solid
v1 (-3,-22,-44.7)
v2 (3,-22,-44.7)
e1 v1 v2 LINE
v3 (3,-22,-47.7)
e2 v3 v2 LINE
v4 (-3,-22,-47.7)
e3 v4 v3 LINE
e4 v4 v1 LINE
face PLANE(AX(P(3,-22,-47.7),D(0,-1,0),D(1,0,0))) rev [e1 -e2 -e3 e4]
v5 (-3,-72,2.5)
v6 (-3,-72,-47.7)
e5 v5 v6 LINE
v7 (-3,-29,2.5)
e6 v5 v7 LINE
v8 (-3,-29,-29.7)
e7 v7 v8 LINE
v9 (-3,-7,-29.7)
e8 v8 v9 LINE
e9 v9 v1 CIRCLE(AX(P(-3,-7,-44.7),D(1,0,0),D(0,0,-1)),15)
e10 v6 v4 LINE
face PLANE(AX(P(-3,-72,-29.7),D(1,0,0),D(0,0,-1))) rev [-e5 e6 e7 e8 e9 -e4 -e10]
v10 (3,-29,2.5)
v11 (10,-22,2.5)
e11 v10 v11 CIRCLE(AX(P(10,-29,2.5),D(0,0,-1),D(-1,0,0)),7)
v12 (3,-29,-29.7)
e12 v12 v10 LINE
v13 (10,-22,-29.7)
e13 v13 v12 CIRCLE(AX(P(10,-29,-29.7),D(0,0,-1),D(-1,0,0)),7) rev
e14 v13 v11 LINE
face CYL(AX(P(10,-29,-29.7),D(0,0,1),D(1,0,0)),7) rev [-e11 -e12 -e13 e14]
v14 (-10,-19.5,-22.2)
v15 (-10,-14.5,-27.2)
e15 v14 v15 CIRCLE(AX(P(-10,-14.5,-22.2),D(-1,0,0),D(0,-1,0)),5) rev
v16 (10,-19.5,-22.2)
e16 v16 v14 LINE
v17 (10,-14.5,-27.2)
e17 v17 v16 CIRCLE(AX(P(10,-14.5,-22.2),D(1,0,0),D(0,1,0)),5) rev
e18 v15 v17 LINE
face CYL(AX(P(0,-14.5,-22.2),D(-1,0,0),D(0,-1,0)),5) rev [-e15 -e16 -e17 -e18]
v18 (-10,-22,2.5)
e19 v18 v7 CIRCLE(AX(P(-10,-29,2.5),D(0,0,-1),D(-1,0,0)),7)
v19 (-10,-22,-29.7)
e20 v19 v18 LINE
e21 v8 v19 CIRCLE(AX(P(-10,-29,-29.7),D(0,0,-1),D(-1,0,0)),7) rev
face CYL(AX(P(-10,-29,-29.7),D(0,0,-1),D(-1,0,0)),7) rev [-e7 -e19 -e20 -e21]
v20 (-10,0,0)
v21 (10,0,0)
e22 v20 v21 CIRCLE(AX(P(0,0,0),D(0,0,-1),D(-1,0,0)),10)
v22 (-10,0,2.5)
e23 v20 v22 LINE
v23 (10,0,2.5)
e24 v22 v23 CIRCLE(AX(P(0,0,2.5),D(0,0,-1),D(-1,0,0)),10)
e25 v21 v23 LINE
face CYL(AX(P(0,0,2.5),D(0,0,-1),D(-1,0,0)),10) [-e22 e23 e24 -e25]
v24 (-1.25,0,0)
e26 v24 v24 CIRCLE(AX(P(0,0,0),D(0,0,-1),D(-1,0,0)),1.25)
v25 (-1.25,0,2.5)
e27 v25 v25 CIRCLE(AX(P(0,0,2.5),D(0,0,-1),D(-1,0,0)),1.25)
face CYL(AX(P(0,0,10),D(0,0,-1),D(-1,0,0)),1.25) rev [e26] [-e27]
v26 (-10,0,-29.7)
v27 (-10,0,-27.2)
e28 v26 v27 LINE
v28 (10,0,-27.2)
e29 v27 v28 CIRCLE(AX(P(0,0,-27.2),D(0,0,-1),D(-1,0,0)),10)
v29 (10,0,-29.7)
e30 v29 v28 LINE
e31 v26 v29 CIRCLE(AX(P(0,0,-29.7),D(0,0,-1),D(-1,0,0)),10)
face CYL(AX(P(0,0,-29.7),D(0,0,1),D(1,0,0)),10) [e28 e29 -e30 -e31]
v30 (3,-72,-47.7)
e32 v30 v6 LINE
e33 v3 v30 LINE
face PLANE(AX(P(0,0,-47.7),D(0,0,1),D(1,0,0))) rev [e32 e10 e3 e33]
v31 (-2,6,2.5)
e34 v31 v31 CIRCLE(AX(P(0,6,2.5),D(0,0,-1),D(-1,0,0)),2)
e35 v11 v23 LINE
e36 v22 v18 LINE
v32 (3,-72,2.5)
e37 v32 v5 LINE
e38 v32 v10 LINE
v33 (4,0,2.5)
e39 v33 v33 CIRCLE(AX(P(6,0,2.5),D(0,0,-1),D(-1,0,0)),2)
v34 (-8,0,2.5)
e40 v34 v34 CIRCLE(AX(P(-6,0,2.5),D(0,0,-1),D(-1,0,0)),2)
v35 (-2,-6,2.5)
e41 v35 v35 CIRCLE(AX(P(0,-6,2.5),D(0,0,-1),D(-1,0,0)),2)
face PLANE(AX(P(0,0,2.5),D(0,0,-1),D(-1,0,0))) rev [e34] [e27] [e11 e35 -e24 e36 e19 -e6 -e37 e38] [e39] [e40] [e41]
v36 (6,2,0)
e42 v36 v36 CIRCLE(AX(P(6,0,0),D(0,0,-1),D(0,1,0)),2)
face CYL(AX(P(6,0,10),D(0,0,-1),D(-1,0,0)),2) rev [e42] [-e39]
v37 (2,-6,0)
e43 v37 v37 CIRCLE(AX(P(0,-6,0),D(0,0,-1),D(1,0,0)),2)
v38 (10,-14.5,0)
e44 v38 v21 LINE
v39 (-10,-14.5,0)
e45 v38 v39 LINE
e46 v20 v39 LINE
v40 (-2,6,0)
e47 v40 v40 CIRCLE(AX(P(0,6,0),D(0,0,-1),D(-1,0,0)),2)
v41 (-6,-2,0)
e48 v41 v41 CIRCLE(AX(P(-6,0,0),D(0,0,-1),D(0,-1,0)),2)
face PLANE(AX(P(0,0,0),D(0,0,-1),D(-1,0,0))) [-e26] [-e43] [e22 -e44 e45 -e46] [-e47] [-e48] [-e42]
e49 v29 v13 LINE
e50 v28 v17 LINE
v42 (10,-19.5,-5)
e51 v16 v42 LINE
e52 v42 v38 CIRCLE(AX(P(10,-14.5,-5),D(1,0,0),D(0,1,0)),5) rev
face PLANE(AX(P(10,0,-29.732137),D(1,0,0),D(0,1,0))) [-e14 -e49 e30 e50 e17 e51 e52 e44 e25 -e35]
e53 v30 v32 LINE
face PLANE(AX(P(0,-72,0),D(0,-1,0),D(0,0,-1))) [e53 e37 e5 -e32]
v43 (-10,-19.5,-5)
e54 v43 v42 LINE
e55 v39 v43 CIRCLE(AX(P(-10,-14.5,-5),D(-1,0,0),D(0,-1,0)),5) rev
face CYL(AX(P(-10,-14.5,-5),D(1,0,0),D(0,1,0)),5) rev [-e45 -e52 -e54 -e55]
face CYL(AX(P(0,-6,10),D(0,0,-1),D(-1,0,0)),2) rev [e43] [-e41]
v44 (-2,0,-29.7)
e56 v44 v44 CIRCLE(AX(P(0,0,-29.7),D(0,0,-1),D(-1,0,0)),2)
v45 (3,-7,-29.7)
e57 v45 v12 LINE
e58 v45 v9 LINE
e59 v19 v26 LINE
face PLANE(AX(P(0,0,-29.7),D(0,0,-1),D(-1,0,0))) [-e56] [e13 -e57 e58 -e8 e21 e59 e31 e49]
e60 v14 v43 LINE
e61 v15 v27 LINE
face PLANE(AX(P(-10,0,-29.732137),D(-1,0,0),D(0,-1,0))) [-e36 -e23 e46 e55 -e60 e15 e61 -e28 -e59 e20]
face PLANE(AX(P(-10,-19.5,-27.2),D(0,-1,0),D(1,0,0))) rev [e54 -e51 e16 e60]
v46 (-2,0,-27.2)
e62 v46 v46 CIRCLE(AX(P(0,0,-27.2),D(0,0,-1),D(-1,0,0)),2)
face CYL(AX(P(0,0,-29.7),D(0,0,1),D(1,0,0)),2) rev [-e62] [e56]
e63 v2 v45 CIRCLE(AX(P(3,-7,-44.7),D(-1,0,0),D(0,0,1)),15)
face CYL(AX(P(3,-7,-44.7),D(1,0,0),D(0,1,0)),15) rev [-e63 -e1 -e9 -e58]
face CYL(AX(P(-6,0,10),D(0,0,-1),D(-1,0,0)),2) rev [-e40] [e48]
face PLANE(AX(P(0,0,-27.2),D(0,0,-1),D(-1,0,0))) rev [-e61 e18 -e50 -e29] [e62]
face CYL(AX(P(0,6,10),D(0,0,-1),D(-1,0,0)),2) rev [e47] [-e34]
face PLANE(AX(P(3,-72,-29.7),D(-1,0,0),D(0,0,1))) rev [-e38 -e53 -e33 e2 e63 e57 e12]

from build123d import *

# Parameters (mm, degrees)
SKETCH2_R           = 10
BOSS_EXTRUDE1_DEPTH = 2.5
SKETCH4_R           = 1.25
CUT_EXTRUDE3_DEPTH  = 10
SKETCH5_R           = 2
CUT_EXTRUDE4_DEPTH  = 10
CIRPATTERN1_COUNT   = 4
BOSS_EXTRUDE2_START = -2.5
BOSS_EXTRUDE2_DEPTH = 2.5
SKETCH8_W           = 20
SKETCH8_H           = 2.5
BOSS_EXTRUDE3_DEPTH = 27.2
BOSS_EXTRUDE4_START = 2.5
SKETCH10_R          = 2
BOSS_EXTRUDE4_DEPTH = 2.5
FILLET1_R           = 5
SKETCH12_W          = 6
SKETCH12_H          = 32.2
BOSS_EXTRUDE5_DEPTH = 50
SKETCH13_W          = 6
SKETCH13_H          = 50
BOSS_EXTRUDE6_DEPTH = 18
FILLET2_R           = 7
FILLET3_R           = 15


with BuildPart() as part:
    # Sketch2 → Boss-Extrude1 (new body)
    with BuildSketch(Plane(origin=(0, 0, 0), x_dir=(-1, 0, 0), z_dir=(0, 0, -1))):
        Circle(SKETCH2_R)
    extrude(amount=-BOSS_EXTRUDE1_DEPTH)

    # Sketch4 → Cut-Extrude3 (cut)
    with BuildSketch(Plane(origin=(0, 0, 0), x_dir=(-1, 0, 0), z_dir=(0, 0, -1))):
        Circle(SKETCH4_R)
    extrude(amount=-CUT_EXTRUDE3_DEPTH, mode=Mode.SUBTRACT)

    # Sketch5 → Cut-Extrude4 (cut)
    with BuildSketch(Plane(origin=(0, 0, 0), x_dir=(-1, 0, 0), z_dir=(0, 0, -1))):
        with Locations((0, 6)):
            Circle(SKETCH5_R)
    cut_extrude4 = extrude(amount=-CUT_EXTRUDE4_DEPTH, mode=Mode.SUBTRACT)

    # CirPattern1: Cut-Extrude4 ×4 about axis
    cirpattern1_axis = Axis((0, 0, 0), (0, 0, 1))
    for i in range(1, CIRPATTERN1_COUNT):
        add(cut_extrude4.rotate(cirpattern1_axis, i * 360 / CIRPATTERN1_COUNT), mode=Mode.SUBTRACT)

    # Sketch6 → Boss-Extrude2 (add)
    with BuildSketch(Plane.XY.offset(2.5).offset(BOSS_EXTRUDE2_START)):
        with BuildLine():
            Line((-10, 0), (-10, -22))
            Line((-10, -22), (10, -22))
            Line((10, -22), (10, 0))
            ThreePointArc((10, 0), (0, -10), (-10, 0))
        make_face()
    extrude(amount=BOSS_EXTRUDE2_DEPTH)

    # Sketch8 → Boss-Extrude3 (add)
    with BuildSketch(Plane(origin=(0, 0, 0), x_dir=(-1, 0, 0), z_dir=(0, 0, -1))):
        with Locations((0, -20.75)):
            Rectangle(SKETCH8_W, SKETCH8_H)
    extrude(amount=BOSS_EXTRUDE3_DEPTH)

    # Sketch10 → Boss-Extrude4 (add)
    with BuildSketch(Plane(origin=(0, 0, -27.2), x_dir=(-1, 0, 0), z_dir=(0, 0, -1)).offset(BOSS_EXTRUDE4_START)):
        with BuildLine():
            Line((-10, -22), (10, -22))
            Line((10, -22), (10, 0))
            ThreePointArc((10, 0), (0, 10), (-10, 0))
            Line((-10, 0), (-10, -22))
        make_face()
        Circle(SKETCH10_R, mode=Mode.SUBTRACT)
    extrude(amount=-BOSS_EXTRUDE4_DEPTH)

    # Fillet1
    fillet1_edges = [part.edges().sort_by_distance(p)[0] for p in [
        (0, -19.5, 0),
        (0, -19.5, -27.2),
    ]]
    fillet(fillet1_edges, radius=FILLET1_R)

    # Sketch12 → Boss-Extrude5 (add)
    with BuildSketch(Plane.XZ.offset(22)):
        with Locations((0, -13.6)):
            Rectangle(SKETCH12_W, SKETCH12_H)
    extrude(amount=BOSS_EXTRUDE5_DEPTH)

    # Sketch13 → Boss-Extrude6 (add)
    with BuildSketch(Plane(origin=(0, 0, -29.7), x_dir=(-1, 0, 0), z_dir=(0, 0, -1))):
        with Locations((0, -47)):
            Rectangle(SKETCH13_W, SKETCH13_H)
    extrude(amount=BOSS_EXTRUDE6_DEPTH)

    # Fillet2
    fillet2_edges = [part.edges().sort_by_distance(p)[0] for p in [
        (-3, -22, -13.6),
        (3, -22, -13.6),
    ]]
    fillet(fillet2_edges, radius=FILLET2_R - 0.0001)  # a hair under: the kernel refuses the full size

    # Fillet3
    fillet3_edges = [part.edges().sort_by_distance(p)[0] for p in [
        (0, -22, -29.7),
    ]]
    fillet(fillet3_edges, radius=FILLET3_R)


solid = part.part
